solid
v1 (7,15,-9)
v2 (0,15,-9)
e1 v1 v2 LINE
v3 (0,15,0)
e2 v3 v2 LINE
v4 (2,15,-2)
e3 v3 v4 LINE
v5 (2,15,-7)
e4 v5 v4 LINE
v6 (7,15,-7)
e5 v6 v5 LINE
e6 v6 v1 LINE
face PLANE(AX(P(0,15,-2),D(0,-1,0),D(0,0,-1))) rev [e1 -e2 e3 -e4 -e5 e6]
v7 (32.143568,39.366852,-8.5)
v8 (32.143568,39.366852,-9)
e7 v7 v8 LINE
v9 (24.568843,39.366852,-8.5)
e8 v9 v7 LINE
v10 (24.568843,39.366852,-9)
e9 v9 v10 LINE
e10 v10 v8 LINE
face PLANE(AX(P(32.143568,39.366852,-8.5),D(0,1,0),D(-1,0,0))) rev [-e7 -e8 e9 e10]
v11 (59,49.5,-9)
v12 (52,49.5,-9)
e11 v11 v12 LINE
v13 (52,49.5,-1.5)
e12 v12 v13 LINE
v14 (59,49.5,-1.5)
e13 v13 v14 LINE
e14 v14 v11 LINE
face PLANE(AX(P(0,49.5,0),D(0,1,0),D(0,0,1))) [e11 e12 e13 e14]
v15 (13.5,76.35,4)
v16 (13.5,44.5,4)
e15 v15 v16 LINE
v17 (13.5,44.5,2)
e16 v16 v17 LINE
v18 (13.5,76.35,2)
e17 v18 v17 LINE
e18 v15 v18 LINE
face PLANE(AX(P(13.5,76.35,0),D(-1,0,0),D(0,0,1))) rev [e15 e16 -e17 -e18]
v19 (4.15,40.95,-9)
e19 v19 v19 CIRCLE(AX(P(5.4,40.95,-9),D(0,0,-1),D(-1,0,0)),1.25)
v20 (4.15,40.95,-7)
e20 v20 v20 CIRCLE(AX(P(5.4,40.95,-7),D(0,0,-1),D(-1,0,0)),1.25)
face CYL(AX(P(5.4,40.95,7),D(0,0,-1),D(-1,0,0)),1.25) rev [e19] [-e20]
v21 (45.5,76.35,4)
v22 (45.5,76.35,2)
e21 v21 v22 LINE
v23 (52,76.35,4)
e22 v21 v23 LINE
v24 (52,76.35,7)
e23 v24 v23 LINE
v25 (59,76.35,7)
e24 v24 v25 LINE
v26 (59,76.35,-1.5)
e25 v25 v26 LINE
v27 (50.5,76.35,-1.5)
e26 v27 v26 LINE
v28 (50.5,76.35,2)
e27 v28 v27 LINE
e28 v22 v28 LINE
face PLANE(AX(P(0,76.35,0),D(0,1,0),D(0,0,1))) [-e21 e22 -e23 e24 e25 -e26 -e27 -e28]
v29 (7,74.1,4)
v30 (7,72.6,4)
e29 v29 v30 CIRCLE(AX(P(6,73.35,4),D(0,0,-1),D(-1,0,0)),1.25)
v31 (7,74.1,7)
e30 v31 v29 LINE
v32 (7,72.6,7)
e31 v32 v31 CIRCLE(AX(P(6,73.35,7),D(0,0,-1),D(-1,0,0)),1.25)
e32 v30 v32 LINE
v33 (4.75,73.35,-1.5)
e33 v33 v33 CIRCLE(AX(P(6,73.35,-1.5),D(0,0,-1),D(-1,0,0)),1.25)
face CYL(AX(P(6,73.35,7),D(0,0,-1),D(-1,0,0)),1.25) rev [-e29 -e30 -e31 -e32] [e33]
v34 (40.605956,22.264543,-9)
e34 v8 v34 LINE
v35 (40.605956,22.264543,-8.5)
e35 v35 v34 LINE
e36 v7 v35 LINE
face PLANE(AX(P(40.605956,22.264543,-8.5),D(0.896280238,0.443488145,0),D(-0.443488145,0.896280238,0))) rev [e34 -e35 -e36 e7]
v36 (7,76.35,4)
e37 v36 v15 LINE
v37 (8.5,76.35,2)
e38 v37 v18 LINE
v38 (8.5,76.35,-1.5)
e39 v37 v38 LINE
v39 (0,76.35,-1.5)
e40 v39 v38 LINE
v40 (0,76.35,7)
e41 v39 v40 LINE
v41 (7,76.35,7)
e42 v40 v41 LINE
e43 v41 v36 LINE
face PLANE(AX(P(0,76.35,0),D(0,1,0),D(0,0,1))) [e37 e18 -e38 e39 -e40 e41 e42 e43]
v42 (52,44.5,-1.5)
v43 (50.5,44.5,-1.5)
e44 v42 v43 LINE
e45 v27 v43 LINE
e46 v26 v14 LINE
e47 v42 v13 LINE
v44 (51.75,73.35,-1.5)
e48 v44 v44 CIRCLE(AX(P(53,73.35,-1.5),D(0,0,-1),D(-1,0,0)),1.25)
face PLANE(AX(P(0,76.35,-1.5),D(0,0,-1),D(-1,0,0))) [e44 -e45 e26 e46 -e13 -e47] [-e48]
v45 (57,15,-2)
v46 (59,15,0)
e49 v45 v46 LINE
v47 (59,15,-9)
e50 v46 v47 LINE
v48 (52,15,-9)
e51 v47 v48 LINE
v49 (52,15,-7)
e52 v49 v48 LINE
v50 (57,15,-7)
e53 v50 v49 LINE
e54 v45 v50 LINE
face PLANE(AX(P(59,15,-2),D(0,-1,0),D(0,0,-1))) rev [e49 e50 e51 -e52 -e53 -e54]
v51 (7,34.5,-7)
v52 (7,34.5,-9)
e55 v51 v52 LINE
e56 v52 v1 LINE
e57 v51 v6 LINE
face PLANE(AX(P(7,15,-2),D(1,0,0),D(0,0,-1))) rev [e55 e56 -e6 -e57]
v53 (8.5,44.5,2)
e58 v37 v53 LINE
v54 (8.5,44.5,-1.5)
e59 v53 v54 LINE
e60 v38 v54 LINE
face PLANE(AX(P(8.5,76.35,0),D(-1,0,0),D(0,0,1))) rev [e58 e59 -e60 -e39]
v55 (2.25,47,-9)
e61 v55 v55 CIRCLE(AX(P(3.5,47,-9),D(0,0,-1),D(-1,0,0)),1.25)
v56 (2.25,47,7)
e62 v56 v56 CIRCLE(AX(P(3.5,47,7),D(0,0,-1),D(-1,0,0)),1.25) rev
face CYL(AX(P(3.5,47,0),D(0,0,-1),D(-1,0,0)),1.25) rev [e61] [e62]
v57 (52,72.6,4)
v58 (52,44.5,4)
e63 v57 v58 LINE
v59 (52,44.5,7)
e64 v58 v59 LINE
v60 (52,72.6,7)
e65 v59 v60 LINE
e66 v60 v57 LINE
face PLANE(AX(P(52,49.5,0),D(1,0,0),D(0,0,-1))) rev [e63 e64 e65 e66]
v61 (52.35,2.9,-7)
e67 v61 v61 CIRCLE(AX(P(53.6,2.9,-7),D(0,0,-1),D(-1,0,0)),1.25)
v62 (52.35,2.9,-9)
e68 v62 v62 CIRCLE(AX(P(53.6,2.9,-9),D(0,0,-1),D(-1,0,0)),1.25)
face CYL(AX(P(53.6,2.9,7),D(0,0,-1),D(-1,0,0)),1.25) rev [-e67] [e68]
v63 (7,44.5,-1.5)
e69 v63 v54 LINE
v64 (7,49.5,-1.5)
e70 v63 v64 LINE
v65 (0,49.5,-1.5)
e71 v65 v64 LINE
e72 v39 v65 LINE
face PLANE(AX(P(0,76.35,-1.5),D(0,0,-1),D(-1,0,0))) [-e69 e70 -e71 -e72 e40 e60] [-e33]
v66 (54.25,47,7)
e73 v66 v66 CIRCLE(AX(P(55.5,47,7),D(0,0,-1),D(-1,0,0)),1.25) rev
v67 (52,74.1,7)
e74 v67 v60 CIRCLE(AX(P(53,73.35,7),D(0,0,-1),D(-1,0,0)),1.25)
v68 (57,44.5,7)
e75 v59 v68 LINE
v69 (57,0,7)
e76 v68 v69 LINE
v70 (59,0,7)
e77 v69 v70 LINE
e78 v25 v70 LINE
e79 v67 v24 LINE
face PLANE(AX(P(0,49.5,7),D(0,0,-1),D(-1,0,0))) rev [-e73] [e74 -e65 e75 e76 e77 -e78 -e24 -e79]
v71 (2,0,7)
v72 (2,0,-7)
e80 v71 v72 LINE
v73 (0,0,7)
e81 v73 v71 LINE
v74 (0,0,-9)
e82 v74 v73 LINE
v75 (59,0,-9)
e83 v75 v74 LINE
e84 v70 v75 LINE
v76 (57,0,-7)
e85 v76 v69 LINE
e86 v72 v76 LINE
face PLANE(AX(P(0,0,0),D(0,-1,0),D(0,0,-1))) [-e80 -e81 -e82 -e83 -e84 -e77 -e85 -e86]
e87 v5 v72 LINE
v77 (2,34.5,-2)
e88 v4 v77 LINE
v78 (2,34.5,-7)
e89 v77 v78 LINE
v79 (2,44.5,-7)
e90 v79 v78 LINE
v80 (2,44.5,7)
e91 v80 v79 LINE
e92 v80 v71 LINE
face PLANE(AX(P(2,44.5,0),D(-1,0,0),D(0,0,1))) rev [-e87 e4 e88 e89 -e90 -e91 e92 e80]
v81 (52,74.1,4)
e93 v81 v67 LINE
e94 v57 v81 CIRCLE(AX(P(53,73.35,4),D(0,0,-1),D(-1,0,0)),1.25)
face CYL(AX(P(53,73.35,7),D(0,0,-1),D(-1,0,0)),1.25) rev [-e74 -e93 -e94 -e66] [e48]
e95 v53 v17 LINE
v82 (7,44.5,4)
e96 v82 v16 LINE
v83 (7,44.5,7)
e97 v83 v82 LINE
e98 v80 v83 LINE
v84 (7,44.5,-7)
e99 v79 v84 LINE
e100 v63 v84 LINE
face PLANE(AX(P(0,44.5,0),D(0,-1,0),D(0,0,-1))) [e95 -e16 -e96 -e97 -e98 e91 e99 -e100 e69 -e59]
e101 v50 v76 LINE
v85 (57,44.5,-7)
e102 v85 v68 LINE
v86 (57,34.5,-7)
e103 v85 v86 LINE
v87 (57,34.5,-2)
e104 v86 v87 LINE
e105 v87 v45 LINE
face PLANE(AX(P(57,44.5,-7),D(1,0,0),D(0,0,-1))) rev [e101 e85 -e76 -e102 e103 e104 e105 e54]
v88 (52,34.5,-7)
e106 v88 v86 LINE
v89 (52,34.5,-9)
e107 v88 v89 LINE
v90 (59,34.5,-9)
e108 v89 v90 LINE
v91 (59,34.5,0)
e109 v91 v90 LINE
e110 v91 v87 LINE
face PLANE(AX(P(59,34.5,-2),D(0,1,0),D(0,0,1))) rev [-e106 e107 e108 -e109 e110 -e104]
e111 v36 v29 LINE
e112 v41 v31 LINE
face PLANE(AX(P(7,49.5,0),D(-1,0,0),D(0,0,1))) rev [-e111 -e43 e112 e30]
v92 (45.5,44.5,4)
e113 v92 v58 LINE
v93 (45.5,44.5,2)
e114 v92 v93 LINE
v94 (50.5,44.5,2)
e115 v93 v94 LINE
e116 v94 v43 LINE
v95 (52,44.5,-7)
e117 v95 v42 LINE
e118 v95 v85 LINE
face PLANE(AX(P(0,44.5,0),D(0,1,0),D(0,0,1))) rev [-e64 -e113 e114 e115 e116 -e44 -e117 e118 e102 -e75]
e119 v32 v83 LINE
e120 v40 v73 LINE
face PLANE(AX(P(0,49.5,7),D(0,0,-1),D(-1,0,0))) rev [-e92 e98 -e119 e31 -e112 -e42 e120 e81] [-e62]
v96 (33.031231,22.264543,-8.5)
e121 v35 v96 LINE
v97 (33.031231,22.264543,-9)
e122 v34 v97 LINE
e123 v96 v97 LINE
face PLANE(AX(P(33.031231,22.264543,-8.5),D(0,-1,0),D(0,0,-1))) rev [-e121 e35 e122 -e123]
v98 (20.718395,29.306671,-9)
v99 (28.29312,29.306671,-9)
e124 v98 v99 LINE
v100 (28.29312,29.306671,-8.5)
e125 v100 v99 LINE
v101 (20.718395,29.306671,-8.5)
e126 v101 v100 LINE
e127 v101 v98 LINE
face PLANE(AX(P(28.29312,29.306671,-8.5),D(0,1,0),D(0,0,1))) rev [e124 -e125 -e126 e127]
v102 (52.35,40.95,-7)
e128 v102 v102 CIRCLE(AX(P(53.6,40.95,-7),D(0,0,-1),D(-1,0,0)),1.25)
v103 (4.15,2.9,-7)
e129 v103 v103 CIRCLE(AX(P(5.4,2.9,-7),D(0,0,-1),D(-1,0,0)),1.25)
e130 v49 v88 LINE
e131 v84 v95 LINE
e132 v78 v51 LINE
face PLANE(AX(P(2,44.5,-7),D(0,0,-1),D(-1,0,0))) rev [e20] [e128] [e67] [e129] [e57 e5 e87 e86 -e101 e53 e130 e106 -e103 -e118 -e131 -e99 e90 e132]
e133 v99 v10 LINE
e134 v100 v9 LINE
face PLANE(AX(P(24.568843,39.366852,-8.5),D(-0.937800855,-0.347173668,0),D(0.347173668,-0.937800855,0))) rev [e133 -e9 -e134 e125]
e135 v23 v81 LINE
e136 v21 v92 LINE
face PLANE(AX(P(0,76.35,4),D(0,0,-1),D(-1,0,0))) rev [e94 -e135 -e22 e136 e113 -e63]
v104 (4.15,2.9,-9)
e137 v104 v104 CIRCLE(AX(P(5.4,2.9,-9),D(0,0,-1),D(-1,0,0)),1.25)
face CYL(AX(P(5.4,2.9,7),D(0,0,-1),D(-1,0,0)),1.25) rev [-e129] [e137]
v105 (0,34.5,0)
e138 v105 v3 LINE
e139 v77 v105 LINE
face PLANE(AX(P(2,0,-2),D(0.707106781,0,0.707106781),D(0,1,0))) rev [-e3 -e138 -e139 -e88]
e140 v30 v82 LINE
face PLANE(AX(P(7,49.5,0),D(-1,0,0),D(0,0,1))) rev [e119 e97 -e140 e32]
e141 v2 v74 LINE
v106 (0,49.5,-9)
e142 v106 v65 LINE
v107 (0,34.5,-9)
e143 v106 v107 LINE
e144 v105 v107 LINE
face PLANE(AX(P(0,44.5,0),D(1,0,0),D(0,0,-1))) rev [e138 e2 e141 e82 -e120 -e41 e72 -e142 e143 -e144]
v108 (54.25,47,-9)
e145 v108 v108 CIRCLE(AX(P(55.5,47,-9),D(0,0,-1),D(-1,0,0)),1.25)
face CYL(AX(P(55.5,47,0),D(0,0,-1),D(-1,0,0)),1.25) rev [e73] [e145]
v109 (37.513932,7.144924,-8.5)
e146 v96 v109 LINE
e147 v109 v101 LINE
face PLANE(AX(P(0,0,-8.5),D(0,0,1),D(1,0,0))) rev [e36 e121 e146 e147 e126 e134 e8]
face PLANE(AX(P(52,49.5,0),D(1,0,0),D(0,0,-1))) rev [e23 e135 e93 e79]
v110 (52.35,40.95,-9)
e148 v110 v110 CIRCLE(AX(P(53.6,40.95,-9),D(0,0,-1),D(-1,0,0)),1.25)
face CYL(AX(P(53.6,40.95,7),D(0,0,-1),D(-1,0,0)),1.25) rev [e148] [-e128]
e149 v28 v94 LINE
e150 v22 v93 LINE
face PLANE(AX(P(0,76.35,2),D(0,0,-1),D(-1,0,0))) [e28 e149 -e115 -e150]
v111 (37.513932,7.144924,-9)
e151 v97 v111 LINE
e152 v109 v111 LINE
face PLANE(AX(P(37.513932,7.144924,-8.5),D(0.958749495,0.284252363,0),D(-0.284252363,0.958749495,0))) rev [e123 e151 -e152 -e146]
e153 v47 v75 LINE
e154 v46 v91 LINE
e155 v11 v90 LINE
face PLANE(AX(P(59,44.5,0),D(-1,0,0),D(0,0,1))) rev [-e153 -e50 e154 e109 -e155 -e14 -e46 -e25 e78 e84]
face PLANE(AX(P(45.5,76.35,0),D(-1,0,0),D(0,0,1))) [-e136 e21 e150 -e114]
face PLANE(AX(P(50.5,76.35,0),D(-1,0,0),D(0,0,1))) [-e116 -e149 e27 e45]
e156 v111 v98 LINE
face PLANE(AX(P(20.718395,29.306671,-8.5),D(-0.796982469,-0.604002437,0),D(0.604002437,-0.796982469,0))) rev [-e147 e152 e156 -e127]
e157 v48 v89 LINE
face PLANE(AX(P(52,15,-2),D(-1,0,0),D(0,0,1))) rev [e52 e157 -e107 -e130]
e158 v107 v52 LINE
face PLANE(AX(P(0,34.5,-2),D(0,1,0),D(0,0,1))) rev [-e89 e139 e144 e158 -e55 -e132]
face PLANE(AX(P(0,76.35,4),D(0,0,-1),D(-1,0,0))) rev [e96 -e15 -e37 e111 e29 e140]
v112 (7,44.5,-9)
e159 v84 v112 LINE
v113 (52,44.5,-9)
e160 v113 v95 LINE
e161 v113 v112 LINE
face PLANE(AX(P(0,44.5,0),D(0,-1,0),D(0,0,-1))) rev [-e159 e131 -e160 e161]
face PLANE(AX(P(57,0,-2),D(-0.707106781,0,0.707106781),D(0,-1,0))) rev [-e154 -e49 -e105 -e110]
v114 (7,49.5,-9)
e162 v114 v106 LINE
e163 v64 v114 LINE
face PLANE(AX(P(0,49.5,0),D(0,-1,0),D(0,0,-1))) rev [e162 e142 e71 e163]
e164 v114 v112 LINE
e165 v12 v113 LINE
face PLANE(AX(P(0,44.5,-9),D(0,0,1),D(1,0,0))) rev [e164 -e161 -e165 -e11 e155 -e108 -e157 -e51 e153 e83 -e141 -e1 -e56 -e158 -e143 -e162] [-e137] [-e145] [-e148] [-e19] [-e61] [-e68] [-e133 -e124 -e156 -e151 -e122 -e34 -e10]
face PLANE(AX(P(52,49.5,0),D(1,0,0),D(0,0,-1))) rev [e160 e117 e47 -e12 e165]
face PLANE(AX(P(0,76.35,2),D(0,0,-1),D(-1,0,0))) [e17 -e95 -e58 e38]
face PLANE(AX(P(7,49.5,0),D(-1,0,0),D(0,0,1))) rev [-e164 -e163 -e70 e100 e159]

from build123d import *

# Parameters (mm, degrees)
BOSS_EXTRUDE1_DEPTH     = 44.5
SKETCH4_W               = 7
SKETCH4_H               = 9
BOSS_EXTRUDE3_DEPTH     = 5
SKETCH5_R               = 1.25
CUT_EXTRUDE3_DEPTH      = 78.538700015
BOSS_EXTRUDE4_DEPTH     = 3
SKETCH10_W              = 7
SKETCH10_H              = 19.5
CUT_EXTRUDE6_DEPTH      = 7
CHAMFER3_SIZE           = 2
CUT_EXTRUDE5_DEPTH      = 78.538700015
CUT_EXTRUDE5_DEPTH_BACK = 78.538700015
SKETCH9_W               = 59
SKETCH9_H               = 2
CUT_EXTRUDE7_DEPTH      = 0.5
SKETCH12_W              = 7
SKETCH12_H              = 2
SKETCH12_W_2            = 1.5
SKETCH12_H_2            = 3.5
SKETCH12_H_3            = 3
BOSS_EXTRUDE5_DEPTH     = 26.85
CUT_EXTRUDE4_START      = -16
CUT_EXTRUDE4_OUTLINE_R  = 1.25
CUT_EXTRUDE4_DEPTH      = 16
SKETCH12_4_W            = 1.5
SKETCH12_4_H            = 3.5
BOSS_EXTRUDE6_DEPTH     = 5


# Read off the part's stored shape, not the designer's step: Cut-Extrude4
with BuildPart() as part:
    # Sketch1 → Boss-Extrude1 (new body)
    with BuildSketch(Plane(origin=(0, 0, 0), x_dir=(1, 0, 0), z_dir=(0, 1, 0))):
        Polygon((0, 0), (2, 0), (2, 7), (57, 7), (57, 0), (59, 0), (59, 9), (0, 9), align=None)
    extrude(amount=BOSS_EXTRUDE1_DEPTH)

    # Sketch4 → Boss-Extrude3 (add)
    with BuildSketch(Plane(origin=(0, 44.5, 0), x_dir=(1, 0, 0), z_dir=(0, 1, 0))):
        with Locations((3.5, 4.5)):
            Rectangle(SKETCH4_W, SKETCH4_H)
        with Locations((55.5, 4.5)):
            Rectangle(SKETCH4_W, SKETCH4_H)
    extrude(amount=BOSS_EXTRUDE3_DEPTH)

    # Sketch5 → Cut-Extrude3 (cut, through all)
    with BuildSketch(Plane(origin=(0, 0, -9), x_dir=(-1, 0, 0), z_dir=(0, 0, -1))):
        with Locations((-55.5, 47)):
            Circle(SKETCH5_R)
        with Locations((-3.5, 47)):
            Circle(SKETCH5_R)
    extrude(amount=-CUT_EXTRUDE3_DEPTH, mode=Mode.SUBTRACT)

    # Sketch3 → Boss-Extrude4 (add)
    with BuildSketch(Plane(origin=(0, 0, -9), x_dir=(-1, 0, 0), z_dir=(0, 0, -1))):
        with BuildLine():
            ThreePointArc((1.75, 5), (1.184653197, 6.045825033), (0, 6.145643924))
            Line((0, 6.145643924), (0, 3.854356076))
            ThreePointArc((0, 3.854356076), (1.184653197, 3.954174967), (1.75, 5))
        make_face()
        with BuildLine():
            Line((-59, 3.854356076), (-59, 6.145643924))
            ThreePointArc((-59, 6.145643924), (-60.75, 5), (-59, 3.854356076))
        make_face()
    extrude(amount=BOSS_EXTRUDE4_DEPTH)


with BuildPart() as boss_extrude4_kept_piece:
    # of the separate pieces the step leaves, the one the design keeps (boss_extrude4_pieces_kept)
    add(part.part.solids().sort_by_distance((0, 49.5, 0))[0])

    # Mirror2: Boss-Extrude4 kept piece across plane


with BuildPart() as boss_extrude4_kept_piece_1:
    add(boss_extrude4_kept_piece.part)
    add(boss_extrude4_kept_piece.part.mirror(Plane.XY))

    # Sketch10 → Cut-Extrude6 (cut)
    with BuildSketch(Plane(origin=(0, 0, -9), x_dir=(-1, 0, 0), z_dir=(0, 0, -1))):
        with Locations((-55.5, 24.75)):
            Rectangle(SKETCH10_W, SKETCH10_H)
        with Locations((-3.5, 24.75)):
            Rectangle(SKETCH10_W, SKETCH10_H)
    extrude(amount=-CUT_EXTRUDE6_DEPTH, mode=Mode.SUBTRACT)

    # Chamfer3
    chamfer3_edges = [boss_extrude4_kept_piece_1.edges().sort_by_distance(p)[0] for p in [
        (0, 24.75, -2),
        (59, 24.75, -2),
    ]]
    chamfer(chamfer3_edges, length=CHAMFER3_SIZE - 0.0001)  # a hair under: the kernel refuses the full size

    # Sketch9 → Cut-Extrude5 (cut, two sides: drawn at the far end of the back side and taken through both)
    with BuildSketch(Plane.XZ.offset(-CUT_EXTRUDE5_DEPTH_BACK)):
        with Locations((29.5, 8)):
            Rectangle(SKETCH9_W, SKETCH9_H)
    extrude(amount=CUT_EXTRUDE5_DEPTH + CUT_EXTRUDE5_DEPTH_BACK, mode=Mode.SUBTRACT)

    # Sketch11 → Cut-Extrude7 (cut)
    with BuildSketch(Plane(origin=(0, 0, -9), x_dir=(-1, 0, 0), z_dir=(0, 0, -1))):
        Polygon((-32.1435681, 39.366852384), (-24.568842978, 39.366852384), (-28.293120049, 29.306670581), (-20.718394926, 29.306670581), (-37.51393239, 7.144924052), (-33.031231201, 22.264543319), (-40.605956323, 22.264543319), align=None)
    extrude(amount=-CUT_EXTRUDE7_DEPTH, mode=Mode.SUBTRACT)

    # Sketch12 → Boss-Extrude5 (add)
    with BuildSketch(Plane(origin=(0, 49.5, 0), x_dir=(1, 0, 0), z_dir=(0, 1, 0))):
        with Locations((55.5, -3)):
            Rectangle(SKETCH12_W, SKETCH12_H)
        Polygon((7, -2), (7, -4), (13.5, -4), (13.5, -2), (8.5, -2), align=None)
        Polygon((45.5, -2), (45.5, -4), (52, -4), (52, -2), (50.5, -2), align=None)
        with Locations((7.75, -0.25)):
            Rectangle(SKETCH12_W_2, SKETCH12_H_2)
        with Locations((3.5, -0.25)):
            Rectangle(SKETCH12_W, SKETCH12_H_2)
        with Locations((51.25, -0.25)):
            Rectangle(SKETCH12_W_2, SKETCH12_H_2)
        with Locations((55.5, -0.25)):
            Rectangle(SKETCH12_W, SKETCH12_H_2)
        with Locations((3.5, -3)):
            Rectangle(SKETCH12_W, SKETCH12_H)
        with Locations((3.5, -5.5)):
            Rectangle(SKETCH12_W, SKETCH12_H_3)
        with Locations((55.5, -5.5)):
            Rectangle(SKETCH12_W, SKETCH12_H_3)
    extrude(amount=BOSS_EXTRUDE5_DEPTH)

    # Cut-Extrude4 outline → Cut-Extrude4 (cut)
    with BuildSketch(Plane(origin=(0, 0, -9), x_dir=(-1, 0, 0), z_dir=(0, 0, -1)).offset(CUT_EXTRUDE4_START)):
        with Locations((-53, 73.35)):
            Circle(CUT_EXTRUDE4_OUTLINE_R)
        with Locations((-6, 73.35)):
            Circle(CUT_EXTRUDE4_OUTLINE_R)
        with Locations((-53.6, 40.95)):
            Circle(CUT_EXTRUDE4_OUTLINE_R)
        with Locations((-5.4, 40.95)):
            Circle(CUT_EXTRUDE4_OUTLINE_R)
        with Locations((-5.4, 2.9)):
            Circle(CUT_EXTRUDE4_OUTLINE_R)
        with Locations((-53.6, 2.9)):
            Circle(CUT_EXTRUDE4_OUTLINE_R)
    extrude(amount=CUT_EXTRUDE4_DEPTH, mode=Mode.SUBTRACT)

    # Sketch12<4> → Boss-Extrude6 (add)
    with BuildSketch(Plane(origin=(0, 49.5, 0), x_dir=(1, 0, 0), z_dir=(0, 1, 0))):
        Polygon((7, -2), (7, -4), (13.5, -4), (13.5, -2), (8.5, -2), align=None)
        Polygon((45.5, -2), (45.5, -4), (52, -4), (52, -2), (50.5, -2), align=None)
        with Locations((7.75, -0.25)):
            Rectangle(SKETCH12_4_W, SKETCH12_4_H)
        with Locations((51.25, -0.25)):
            Rectangle(SKETCH12_4_W, SKETCH12_4_H)
    extrude(amount=-BOSS_EXTRUDE6_DEPTH)


solid = boss_extrude4_kept_piece_1.part
